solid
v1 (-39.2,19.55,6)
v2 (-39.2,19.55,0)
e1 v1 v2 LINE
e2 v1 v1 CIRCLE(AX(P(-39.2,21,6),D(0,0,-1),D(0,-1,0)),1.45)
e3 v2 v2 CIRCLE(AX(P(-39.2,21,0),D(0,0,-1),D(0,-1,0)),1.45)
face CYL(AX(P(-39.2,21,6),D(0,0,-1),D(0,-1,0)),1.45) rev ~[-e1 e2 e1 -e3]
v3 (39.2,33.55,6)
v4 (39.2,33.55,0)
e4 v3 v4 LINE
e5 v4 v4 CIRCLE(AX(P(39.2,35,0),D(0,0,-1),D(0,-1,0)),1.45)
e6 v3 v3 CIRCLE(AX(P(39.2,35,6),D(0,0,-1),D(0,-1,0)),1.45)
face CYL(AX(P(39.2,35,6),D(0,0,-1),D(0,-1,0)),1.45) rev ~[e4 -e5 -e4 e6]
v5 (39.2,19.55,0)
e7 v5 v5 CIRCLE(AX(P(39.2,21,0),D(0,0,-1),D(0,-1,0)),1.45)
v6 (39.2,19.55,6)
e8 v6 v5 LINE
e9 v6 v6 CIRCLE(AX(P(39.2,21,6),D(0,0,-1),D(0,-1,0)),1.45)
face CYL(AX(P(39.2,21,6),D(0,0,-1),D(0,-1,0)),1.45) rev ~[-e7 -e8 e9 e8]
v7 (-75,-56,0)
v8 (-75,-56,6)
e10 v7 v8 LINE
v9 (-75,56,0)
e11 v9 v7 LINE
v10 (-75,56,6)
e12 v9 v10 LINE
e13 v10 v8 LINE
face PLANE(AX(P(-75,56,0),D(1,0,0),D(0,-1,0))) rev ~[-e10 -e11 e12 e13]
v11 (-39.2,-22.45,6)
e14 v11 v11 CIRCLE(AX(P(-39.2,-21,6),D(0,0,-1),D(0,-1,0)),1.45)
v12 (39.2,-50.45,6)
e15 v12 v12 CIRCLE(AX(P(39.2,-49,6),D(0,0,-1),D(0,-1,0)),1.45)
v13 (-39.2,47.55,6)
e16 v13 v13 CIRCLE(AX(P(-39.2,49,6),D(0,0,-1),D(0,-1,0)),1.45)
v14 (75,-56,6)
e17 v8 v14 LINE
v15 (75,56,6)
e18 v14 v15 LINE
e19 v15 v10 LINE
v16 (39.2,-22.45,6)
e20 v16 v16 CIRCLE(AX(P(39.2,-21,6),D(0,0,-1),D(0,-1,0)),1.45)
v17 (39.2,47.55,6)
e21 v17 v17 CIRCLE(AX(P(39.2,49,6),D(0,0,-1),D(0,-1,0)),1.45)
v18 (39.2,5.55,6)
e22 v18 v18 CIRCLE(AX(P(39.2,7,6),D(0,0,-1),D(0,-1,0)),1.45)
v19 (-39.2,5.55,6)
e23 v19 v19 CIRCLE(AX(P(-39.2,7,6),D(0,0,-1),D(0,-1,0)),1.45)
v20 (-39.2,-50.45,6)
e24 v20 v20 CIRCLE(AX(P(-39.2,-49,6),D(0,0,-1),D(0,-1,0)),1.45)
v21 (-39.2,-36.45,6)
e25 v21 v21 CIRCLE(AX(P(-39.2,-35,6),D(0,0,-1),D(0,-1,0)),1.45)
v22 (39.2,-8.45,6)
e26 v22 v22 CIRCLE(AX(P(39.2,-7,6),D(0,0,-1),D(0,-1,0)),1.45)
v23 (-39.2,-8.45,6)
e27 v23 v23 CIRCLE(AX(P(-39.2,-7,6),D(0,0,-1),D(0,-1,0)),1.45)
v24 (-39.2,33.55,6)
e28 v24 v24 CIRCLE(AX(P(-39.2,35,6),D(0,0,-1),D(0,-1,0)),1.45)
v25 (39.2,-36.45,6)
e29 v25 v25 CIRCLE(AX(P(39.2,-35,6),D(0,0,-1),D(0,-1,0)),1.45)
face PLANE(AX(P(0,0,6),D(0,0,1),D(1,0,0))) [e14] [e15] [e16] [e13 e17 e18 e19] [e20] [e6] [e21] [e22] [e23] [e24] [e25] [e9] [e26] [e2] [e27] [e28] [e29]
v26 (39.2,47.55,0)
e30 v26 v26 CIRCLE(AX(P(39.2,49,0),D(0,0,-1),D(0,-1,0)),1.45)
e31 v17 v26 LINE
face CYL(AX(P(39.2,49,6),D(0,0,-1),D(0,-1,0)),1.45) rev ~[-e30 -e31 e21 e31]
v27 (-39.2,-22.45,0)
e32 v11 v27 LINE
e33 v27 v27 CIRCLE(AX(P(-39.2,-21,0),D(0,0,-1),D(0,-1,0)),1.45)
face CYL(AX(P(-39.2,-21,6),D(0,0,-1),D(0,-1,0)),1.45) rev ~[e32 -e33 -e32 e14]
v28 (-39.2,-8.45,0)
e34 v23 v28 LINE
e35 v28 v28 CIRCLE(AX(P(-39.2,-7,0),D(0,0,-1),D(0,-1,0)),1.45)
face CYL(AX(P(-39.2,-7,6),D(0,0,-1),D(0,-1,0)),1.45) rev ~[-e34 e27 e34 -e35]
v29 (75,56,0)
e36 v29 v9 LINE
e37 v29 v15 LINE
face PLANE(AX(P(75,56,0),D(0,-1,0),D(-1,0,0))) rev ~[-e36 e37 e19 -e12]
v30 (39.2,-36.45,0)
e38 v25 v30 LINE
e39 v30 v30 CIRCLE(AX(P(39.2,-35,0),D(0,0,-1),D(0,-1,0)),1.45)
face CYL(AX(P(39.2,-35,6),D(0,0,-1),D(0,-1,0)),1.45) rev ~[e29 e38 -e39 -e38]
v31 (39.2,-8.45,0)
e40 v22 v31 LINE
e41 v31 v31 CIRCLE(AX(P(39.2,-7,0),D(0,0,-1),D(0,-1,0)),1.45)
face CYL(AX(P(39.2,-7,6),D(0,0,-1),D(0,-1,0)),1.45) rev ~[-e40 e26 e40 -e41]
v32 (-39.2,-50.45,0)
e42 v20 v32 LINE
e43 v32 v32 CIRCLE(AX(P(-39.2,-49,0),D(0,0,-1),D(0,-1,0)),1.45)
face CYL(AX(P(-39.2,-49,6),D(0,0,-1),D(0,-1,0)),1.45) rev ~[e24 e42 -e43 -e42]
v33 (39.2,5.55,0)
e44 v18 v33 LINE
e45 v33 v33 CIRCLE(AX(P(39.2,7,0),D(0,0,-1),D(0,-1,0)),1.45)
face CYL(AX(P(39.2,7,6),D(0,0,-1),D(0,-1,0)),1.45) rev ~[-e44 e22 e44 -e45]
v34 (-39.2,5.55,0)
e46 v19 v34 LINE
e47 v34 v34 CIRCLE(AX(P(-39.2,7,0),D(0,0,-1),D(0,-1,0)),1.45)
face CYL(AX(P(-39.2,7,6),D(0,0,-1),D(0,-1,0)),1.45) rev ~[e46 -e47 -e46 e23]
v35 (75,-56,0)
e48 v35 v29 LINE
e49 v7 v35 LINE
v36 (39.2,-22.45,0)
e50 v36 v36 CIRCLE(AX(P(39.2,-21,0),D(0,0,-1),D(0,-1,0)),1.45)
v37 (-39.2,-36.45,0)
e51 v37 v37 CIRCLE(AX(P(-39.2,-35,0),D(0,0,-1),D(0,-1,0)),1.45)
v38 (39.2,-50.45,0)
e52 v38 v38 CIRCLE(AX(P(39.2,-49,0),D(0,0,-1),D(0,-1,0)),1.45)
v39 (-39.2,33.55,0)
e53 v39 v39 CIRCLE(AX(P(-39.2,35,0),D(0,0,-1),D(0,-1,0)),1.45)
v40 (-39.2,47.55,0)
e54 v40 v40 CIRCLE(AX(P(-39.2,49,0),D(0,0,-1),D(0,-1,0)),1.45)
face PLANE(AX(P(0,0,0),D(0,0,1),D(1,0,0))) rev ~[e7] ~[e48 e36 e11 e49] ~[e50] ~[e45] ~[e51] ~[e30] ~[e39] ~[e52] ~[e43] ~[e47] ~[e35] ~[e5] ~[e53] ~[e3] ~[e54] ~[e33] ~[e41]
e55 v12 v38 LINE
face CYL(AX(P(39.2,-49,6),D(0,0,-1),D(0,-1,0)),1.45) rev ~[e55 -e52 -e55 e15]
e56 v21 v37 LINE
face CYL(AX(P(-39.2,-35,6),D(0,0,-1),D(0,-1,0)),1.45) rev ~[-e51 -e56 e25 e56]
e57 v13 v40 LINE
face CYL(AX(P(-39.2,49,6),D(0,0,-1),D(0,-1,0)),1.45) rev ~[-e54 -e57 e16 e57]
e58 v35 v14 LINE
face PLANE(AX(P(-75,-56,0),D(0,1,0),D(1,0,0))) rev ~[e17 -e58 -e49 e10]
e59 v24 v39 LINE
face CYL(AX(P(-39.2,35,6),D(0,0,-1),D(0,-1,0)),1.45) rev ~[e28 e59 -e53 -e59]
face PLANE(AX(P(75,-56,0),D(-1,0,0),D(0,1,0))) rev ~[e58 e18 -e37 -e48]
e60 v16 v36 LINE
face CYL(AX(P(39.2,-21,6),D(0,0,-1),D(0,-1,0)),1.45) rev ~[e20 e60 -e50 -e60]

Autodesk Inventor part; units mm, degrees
ref_plane "YZ Plane" through (0, 0, 0) normal (1, 0, 0) x (0, 1, 0)
ref_plane "XZ Plane" through (0, 0, 0) normal (0, 1, 0) x (-1, 0, 0)
ref_plane "XY Plane" through (0, 0, 0) normal (0, 0, 1) x (1, 0, 0)
sketch "Sketch1" plane through (0, 0, 0) normal (0, 0, 1) x (1, 0, 0)
  line L0 (-75, -56) -> (75, -56)
  line L1 (75, -56) -> (75, 56)
  line L2 (75, 56) -> (-75, 56)
  line L3 (-75, 56) -> (-75, -56)
  line L4 (-75, -56) -> (75, 56) construction
  line L5 (75, -56) -> (-75, 56) construction
  point P0 (0, 0)
  dimension "d0" = 150
  dimension "d1" = 112
extrude "Extrusion1" add sketch "Sketch1" along normal blind 6
sketch "Sketch2" plane through (0, 0, 6) normal (0, 0, 1) x (1, 0, 0)
  line L0 (-75, -56) -> (75, -56) projected
  line L1 (75, -56) -> (75, 56) projected
  line L2 (75, 56) -> (-75, 56) projected
  line L3 (-75, 56) -> (-75, -56) projected
  line L4 (-39.2, 7) -> (39.2, 7)
  point P0 (0, 0)
  dimension "d4" = 78.4
  dimension "d13" = 7
  dimension "d14" = 39.2
hole "Hole1" at (-39.2, 7, 6) at (39.2, 7, 6) direction (0, 0, -1) diameter 2.9 end through all clearance for "Flat Head Machine Screw" size "M2.5" standard "Ansi Metric M Profile"
pattern_linear "Rectangular Pattern1" count 8 spacing 14 along (0, -1, 0) of "Hole1" first direction both ways yes
equation "\"d13\" = 0.5 * tileThickness + 0.5 * tileSeperation"
equation "\"d14\" = 0.5 * d4"
equation "\"d17\" = tileSeperation + tileThickness"
equation "\"tileSeperation\" = 7"
equation "\"tileThickness\" = 7"
properties part number "holderStack" material "Polycarbonate, Clear"
